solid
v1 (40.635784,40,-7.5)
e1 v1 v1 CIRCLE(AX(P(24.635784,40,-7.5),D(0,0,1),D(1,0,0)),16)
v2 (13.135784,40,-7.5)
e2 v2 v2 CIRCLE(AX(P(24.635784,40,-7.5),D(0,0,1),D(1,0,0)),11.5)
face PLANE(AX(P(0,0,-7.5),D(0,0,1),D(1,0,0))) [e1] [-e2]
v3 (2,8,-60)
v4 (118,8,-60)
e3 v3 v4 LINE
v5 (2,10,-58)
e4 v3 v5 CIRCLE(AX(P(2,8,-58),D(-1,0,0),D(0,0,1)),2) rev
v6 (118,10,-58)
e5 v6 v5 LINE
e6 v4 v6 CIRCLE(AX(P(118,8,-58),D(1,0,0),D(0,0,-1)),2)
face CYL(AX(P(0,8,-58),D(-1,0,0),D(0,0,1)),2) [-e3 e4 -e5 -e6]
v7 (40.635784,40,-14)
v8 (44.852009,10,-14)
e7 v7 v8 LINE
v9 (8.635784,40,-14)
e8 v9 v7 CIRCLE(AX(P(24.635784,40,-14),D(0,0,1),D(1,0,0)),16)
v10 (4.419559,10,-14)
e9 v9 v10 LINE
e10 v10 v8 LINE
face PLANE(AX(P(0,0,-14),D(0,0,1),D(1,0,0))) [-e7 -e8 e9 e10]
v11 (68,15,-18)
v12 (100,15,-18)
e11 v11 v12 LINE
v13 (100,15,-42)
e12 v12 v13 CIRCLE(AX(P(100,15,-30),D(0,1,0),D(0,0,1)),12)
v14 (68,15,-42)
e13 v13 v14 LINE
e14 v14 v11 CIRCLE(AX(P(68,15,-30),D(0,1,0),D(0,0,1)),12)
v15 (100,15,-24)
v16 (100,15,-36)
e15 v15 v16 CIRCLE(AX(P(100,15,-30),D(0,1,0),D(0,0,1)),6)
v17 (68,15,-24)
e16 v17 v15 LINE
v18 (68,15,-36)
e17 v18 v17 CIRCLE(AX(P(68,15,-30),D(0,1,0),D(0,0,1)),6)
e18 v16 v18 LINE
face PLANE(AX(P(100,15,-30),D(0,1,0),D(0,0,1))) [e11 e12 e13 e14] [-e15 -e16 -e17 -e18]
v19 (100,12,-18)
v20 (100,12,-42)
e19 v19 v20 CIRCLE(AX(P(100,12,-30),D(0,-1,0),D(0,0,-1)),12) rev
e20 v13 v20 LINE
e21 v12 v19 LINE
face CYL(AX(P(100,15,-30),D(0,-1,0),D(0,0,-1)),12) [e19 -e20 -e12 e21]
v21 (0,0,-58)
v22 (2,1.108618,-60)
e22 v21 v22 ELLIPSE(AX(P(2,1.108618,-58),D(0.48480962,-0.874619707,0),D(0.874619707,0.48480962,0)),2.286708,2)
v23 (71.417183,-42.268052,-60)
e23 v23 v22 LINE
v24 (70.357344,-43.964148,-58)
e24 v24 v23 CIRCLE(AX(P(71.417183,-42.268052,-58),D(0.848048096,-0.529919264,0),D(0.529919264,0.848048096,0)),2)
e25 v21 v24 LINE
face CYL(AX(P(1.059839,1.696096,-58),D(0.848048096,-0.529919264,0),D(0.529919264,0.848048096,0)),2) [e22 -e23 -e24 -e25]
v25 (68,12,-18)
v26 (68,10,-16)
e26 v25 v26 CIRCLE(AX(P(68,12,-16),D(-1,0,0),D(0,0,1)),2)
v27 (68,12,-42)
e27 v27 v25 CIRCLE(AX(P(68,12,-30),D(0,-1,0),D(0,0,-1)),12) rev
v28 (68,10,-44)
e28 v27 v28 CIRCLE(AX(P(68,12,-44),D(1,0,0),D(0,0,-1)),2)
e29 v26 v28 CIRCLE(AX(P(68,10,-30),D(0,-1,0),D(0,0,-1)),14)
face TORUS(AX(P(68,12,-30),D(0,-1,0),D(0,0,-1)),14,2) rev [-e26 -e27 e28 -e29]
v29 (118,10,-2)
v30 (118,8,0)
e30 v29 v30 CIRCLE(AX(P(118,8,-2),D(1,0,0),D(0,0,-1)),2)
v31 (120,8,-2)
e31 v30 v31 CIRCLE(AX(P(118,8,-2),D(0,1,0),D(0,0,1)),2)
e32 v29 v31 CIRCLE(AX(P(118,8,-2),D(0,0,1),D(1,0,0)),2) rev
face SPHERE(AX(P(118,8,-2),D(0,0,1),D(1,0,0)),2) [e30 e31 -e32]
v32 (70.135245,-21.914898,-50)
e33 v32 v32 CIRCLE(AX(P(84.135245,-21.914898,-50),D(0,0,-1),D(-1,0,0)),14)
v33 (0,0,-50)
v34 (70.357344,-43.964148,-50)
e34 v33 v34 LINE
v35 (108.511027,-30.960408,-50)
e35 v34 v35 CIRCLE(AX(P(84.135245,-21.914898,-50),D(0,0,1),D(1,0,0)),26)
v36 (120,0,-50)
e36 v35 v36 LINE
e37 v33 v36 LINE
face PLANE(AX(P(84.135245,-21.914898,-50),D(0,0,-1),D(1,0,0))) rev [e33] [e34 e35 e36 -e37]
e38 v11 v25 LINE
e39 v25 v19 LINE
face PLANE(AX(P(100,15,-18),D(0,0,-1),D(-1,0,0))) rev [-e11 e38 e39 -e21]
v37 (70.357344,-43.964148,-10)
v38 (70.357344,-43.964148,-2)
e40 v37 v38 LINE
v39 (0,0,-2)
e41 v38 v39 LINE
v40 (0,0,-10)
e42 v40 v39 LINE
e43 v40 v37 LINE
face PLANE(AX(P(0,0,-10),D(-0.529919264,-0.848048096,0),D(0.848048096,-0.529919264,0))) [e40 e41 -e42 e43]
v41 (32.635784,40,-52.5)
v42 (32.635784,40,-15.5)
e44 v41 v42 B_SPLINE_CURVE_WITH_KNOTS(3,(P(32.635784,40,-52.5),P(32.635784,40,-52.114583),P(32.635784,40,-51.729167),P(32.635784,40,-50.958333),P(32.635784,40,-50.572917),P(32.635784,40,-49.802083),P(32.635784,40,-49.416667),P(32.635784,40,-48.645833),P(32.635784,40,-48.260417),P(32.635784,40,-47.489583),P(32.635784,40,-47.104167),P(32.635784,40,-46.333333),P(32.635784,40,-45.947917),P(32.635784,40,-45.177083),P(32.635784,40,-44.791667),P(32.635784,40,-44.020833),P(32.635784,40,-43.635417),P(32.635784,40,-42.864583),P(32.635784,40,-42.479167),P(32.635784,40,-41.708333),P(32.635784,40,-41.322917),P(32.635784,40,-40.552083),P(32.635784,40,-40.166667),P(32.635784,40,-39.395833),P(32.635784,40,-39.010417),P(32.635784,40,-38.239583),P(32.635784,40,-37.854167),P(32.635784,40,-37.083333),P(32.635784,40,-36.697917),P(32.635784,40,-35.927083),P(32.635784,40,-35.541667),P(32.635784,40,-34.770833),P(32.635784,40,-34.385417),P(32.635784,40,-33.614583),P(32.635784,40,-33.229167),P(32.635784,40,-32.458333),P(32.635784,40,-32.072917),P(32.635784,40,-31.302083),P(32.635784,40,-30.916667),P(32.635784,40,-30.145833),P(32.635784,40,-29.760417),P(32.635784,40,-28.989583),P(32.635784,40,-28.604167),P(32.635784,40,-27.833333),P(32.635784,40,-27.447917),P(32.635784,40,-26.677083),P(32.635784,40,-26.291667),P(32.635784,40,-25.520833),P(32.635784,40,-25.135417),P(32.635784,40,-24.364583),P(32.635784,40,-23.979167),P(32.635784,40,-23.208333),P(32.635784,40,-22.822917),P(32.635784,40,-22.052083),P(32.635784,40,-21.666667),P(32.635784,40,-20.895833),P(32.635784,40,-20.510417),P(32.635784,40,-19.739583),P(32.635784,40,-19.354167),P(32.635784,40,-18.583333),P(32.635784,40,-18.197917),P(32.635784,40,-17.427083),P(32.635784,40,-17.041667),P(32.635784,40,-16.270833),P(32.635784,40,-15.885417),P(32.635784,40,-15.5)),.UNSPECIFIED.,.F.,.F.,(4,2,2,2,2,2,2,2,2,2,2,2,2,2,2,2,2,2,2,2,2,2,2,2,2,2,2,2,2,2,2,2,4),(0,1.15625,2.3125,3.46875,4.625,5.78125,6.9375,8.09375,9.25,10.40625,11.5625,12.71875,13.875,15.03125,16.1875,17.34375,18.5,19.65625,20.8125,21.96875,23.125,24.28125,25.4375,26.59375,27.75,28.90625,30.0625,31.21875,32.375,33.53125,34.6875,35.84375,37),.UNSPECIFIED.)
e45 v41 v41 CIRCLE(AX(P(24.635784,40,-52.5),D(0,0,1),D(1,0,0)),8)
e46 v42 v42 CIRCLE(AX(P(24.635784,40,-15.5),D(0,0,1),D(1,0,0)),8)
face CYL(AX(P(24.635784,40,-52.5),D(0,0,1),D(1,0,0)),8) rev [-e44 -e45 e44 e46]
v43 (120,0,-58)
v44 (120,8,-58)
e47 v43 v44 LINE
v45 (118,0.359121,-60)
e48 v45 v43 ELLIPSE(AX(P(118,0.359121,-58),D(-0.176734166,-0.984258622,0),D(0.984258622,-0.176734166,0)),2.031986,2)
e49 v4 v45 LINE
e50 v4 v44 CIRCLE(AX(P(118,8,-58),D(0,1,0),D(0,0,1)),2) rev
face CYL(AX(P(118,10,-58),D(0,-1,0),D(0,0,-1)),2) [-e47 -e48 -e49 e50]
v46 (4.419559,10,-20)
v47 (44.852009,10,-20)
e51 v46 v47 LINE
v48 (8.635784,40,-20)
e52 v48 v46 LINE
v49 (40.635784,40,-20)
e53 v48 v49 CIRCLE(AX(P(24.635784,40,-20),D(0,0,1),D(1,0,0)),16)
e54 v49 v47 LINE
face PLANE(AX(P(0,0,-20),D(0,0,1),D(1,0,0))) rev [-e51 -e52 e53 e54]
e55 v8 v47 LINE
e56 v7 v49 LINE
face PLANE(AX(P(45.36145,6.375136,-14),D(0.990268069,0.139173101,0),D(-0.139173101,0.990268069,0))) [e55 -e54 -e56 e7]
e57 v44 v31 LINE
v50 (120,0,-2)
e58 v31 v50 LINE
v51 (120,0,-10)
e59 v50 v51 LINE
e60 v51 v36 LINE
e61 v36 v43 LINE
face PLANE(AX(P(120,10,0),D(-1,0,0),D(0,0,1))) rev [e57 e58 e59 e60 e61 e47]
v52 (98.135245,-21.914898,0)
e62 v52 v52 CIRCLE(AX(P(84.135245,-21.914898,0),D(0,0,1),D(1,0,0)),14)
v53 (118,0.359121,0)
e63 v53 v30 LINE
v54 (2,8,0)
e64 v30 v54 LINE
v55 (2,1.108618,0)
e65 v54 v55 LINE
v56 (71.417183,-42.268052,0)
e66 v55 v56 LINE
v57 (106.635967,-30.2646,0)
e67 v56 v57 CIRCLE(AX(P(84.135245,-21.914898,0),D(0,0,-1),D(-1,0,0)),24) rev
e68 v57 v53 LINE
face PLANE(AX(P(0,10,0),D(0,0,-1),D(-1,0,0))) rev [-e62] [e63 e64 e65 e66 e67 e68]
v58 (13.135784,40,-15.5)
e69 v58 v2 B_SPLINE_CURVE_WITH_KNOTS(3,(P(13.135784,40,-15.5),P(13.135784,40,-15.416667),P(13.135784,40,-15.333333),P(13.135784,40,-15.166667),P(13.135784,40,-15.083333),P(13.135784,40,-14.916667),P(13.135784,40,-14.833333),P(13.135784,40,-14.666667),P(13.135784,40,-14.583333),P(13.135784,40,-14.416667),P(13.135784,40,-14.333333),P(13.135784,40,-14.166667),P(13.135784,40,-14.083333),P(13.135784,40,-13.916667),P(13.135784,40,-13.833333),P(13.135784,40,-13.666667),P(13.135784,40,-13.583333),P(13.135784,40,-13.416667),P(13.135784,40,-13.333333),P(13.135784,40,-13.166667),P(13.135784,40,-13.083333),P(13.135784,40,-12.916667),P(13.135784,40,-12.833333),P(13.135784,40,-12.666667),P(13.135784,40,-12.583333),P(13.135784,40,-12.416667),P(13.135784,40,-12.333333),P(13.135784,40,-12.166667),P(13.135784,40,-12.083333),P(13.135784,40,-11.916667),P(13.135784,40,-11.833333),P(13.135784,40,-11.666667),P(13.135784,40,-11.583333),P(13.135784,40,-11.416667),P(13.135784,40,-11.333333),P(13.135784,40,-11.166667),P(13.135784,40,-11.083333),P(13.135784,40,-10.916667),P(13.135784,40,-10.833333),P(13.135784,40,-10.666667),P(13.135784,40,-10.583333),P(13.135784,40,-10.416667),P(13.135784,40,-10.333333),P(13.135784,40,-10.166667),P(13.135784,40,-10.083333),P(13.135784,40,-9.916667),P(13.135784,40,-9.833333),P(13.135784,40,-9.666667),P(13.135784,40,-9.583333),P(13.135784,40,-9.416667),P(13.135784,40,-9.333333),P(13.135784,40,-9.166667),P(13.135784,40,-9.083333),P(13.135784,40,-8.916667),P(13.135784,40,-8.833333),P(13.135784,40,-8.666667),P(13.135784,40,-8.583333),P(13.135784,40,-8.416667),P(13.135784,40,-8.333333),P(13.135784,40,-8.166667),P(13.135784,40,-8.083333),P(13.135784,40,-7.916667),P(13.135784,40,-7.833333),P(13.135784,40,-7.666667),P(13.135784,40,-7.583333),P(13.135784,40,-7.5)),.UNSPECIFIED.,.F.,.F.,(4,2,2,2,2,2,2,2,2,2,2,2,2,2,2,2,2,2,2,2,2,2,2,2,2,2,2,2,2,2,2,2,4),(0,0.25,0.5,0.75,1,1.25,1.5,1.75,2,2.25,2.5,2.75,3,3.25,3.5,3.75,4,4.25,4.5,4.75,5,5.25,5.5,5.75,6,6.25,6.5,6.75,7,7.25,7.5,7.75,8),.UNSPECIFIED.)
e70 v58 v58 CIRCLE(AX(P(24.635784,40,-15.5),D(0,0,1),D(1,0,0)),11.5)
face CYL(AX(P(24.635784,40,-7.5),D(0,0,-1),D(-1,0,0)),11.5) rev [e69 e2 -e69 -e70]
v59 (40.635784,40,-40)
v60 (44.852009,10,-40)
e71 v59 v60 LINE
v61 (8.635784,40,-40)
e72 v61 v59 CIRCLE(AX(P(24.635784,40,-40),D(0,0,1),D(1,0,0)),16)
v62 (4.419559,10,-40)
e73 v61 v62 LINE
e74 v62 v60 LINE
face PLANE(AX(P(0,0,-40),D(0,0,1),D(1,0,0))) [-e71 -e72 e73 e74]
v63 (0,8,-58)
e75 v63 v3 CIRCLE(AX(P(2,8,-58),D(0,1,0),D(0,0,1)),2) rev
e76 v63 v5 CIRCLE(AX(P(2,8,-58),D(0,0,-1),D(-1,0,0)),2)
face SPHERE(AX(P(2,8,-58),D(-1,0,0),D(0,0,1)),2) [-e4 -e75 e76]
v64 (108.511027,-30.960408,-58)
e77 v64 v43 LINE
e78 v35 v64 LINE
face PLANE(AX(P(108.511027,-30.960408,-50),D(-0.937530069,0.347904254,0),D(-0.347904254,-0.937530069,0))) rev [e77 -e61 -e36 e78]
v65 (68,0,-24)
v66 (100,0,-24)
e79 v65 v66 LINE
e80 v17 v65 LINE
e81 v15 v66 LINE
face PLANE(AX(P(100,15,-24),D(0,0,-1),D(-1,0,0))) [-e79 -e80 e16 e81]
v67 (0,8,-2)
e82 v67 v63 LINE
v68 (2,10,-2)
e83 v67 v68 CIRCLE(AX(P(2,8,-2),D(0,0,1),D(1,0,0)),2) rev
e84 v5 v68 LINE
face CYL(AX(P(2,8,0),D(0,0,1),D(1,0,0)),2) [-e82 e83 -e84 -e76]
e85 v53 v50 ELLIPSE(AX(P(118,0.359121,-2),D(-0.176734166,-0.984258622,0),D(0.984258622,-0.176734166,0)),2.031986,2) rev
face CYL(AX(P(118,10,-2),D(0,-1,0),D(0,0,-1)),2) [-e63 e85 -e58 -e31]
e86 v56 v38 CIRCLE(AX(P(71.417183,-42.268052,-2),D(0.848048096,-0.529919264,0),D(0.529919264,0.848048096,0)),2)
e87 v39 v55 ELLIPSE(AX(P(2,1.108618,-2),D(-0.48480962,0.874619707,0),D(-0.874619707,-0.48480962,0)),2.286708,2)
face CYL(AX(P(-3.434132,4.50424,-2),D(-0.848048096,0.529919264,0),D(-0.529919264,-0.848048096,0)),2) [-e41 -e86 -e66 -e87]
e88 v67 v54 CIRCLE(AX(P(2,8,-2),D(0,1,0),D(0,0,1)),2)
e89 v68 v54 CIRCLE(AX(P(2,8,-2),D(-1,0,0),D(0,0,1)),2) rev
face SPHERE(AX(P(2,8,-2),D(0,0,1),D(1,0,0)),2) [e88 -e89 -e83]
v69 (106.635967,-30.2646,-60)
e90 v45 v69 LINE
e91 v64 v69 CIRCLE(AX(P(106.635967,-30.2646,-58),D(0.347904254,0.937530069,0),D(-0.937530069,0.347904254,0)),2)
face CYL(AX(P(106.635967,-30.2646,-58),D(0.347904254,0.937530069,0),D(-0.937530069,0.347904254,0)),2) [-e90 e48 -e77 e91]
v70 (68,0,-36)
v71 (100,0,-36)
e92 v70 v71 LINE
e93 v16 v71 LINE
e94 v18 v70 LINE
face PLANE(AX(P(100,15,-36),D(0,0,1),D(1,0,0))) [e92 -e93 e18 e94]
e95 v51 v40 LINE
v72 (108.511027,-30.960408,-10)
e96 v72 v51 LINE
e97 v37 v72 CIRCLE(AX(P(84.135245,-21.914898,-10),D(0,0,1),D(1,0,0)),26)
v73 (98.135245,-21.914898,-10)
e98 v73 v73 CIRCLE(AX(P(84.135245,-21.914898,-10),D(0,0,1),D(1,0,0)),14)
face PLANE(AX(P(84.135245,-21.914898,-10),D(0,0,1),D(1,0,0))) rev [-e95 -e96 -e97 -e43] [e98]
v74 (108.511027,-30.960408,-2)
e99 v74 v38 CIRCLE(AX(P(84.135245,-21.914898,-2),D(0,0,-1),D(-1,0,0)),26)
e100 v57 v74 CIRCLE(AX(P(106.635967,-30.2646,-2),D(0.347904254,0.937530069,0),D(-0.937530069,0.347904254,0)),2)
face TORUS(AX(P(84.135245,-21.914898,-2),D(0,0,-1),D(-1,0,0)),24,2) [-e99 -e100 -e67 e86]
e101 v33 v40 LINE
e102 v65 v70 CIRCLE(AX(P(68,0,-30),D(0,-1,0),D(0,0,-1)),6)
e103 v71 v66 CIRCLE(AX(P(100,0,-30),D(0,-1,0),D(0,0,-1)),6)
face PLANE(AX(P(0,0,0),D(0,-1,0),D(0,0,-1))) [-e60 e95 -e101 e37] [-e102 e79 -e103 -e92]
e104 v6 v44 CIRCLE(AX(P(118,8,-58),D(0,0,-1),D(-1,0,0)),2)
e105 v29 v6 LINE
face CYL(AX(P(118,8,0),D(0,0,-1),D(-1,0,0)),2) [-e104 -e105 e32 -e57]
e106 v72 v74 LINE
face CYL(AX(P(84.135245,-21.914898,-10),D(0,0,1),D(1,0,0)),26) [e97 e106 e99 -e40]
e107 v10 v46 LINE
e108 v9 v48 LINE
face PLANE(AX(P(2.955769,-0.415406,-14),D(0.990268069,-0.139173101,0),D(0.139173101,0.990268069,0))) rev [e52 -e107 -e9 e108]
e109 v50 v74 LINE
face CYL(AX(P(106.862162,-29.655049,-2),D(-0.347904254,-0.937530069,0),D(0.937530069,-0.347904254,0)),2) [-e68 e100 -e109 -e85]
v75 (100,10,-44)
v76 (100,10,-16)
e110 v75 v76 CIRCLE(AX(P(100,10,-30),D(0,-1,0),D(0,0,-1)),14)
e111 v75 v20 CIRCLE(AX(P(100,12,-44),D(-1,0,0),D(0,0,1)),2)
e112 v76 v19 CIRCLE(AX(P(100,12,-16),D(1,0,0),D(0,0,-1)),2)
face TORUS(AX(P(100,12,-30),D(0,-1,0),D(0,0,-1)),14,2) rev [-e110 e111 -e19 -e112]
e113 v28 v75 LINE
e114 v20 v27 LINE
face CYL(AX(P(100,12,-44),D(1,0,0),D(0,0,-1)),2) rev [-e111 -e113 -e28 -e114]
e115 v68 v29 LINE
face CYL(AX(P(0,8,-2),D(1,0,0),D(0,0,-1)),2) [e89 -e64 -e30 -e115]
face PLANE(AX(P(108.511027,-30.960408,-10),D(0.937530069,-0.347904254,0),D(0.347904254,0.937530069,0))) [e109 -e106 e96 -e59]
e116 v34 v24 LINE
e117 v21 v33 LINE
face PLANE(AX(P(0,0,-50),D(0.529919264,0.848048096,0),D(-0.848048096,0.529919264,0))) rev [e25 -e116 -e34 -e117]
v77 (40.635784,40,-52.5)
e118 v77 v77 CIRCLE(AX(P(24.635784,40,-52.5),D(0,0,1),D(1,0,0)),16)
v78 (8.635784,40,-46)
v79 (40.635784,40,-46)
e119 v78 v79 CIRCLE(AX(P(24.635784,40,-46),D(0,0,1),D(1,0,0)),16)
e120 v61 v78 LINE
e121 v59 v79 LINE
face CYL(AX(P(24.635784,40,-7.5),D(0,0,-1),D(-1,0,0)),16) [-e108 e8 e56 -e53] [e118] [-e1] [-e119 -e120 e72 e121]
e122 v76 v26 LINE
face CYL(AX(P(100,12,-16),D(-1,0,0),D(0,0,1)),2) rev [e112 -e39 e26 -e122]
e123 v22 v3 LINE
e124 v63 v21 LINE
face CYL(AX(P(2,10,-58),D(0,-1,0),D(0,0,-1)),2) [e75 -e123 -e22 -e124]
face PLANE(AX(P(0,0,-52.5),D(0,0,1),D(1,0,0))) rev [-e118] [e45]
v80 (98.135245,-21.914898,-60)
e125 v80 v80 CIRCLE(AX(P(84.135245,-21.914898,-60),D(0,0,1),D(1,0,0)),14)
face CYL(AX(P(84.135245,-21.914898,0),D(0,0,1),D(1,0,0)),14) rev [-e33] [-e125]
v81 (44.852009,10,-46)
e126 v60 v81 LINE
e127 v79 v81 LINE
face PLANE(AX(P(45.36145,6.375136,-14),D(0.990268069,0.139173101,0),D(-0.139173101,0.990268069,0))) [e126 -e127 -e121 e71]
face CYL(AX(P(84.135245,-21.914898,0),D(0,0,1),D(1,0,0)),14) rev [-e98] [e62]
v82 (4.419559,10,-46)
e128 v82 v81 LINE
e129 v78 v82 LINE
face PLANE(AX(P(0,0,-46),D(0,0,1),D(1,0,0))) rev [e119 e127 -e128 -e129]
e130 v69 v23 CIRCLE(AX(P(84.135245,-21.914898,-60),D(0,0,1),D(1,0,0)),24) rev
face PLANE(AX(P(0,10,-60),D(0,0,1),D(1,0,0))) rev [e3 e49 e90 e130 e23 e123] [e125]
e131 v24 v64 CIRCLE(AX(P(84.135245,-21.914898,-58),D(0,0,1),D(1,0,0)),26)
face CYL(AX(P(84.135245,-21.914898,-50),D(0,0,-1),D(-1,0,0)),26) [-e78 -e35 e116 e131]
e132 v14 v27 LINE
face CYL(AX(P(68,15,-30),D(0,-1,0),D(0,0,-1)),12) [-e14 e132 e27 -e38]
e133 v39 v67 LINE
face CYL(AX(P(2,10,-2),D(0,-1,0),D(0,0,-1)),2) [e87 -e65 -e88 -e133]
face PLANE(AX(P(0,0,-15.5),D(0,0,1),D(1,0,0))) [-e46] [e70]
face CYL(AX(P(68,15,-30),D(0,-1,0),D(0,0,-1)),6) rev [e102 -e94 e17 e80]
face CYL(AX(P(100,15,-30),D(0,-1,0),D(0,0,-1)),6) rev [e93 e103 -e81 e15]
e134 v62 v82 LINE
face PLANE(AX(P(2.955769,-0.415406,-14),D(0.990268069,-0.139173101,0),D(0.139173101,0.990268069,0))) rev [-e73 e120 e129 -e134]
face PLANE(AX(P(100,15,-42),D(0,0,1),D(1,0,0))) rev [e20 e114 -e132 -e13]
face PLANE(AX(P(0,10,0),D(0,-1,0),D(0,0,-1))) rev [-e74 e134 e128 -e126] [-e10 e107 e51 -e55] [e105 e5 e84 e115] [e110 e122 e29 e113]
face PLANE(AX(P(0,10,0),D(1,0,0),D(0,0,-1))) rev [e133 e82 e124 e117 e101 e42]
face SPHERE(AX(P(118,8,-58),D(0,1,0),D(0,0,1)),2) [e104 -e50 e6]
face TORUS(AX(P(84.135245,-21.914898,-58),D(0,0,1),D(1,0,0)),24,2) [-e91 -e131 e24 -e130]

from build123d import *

# Parameters (mm, degrees)
SKETCH1_W                  = 120
SKETCH1_H                  = 60
BOSS_EXTRUDE1_DEPTH        = 10
BOSS_EXTRUDE2_DEPTH        = 10
F_25_0_28_DIAMETER_HOLE1_D = 28
BOSS_EXTRUDE3_DEPTH        = 5
CUT_EXTRUDE1_DEPTH         = 147.130542204
SKETCH7_R                  = 11.5
BOSS_EXTRUDE4_DEPTH        = 22.5
BOSS_EXTRUDE5_DEPTH        = 16
CUT_EXTRUDE2_DEPTH         = 10
BOSS_EXTRUDE6_DEPTH        = 14.5
BOSS_EXTRUDE6_DEPTH_BACK   = 22.5
SKETCH7_7_R                = 11.5
SKETCH7_7_R_2              = 8
FILLET1_R                  = 2


with BuildPart() as part:
    # Sketch1 → Boss-Extrude1 (new body)
    with BuildSketch(Plane(origin=(0, 0, 0), x_dir=(1, 0, 0), z_dir=(0, 1, 0))):
        with Locations((60, 30)):
            Rectangle(SKETCH1_W, SKETCH1_H)
    extrude(amount=BOSS_EXTRUDE1_DEPTH)

    # Sketch2 → Boss-Extrude2 (add)
    with BuildSketch(Plane.XY):
        with BuildLine():
            Line((0, 10), (0, 0))
            Line((0, 0), (70.357344256, -43.964148108))
            ThreePointArc((70.357344256, -43.964148108), (92.522919584, -46.524792309), (108.511026917, -30.960408214))
            Line((108.511026917, -30.960408214), (120, 0))
            Line((120, 0), (120, 10))
            Line((120, 10), (0, 10))
        make_face()
    boss_extrude2 = extrude(amount=-BOSS_EXTRUDE2_DEPTH)

    # Mirror1: Boss-Extrude2 across plane
    add(boss_extrude2.mirror(Plane.XY.offset(-30)))

    # Ø25.0 (28) Diameter Hole1 (through all)
    with Locations(Plane(origin=(84.135245127, -21.914897608, 0), x_dir=(1, 0, 0), z_dir=(0, 0, 1))):
        with Locations((0, 0)):
            Hole(F_25_0_28_DIAMETER_HOLE1_D / 2)

    # Sketch5 → Boss-Extrude3 (add)
    with BuildSketch(Plane(origin=(0, 10, 0), x_dir=(1, 0, 0), z_dir=(0, 1, 0))):
        with BuildLine():
            Line((100, 18), (68, 18))
            ThreePointArc((68, 18), (56, 30), (68, 42))
            Line((68, 42), (100, 42))
            ThreePointArc((100, 42), (112, 30), (100, 18))
        make_face()
        with BuildLine():
            Line((100, 24), (68, 24))
            ThreePointArc((68, 24), (62, 30), (68, 36))
            Line((68, 36), (100, 36))
            ThreePointArc((100, 36), (106, 30), (100, 24))
        make_face(mode=Mode.SUBTRACT)
    extrude(amount=BOSS_EXTRUDE3_DEPTH)

    # Sketch5<2> → Cut-Extrude1 (cut, through all)
    with BuildSketch(Plane(origin=(0, 10, 0), x_dir=(1, 0, 0), z_dir=(0, 1, 0))):
        with BuildLine():
            Line((68, 24), (100, 24))
            ThreePointArc((100, 24), (106, 30), (100, 36))
            Line((100, 36), (68, 36))
            ThreePointArc((68, 36), (62, 30), (68, 24))
        make_face()
    extrude(amount=-CUT_EXTRUDE1_DEPTH, mode=Mode.SUBTRACT)



with BuildPart() as body_2:
    # Sketch7 → Boss-Extrude4 (new, symmetric)
    with BuildSketch(Plane.XY.offset(-30)):
        with BuildLine():
            ThreePointArc((40.635783634, 40), (24.635783634, 56), (8.635783634, 40))
            ThreePointArc((8.635783634, 40), (24.635783634, 24), (40.635783634, 40))
        make_face()
        with Locations((24.635783634, 40)):
            Circle(SKETCH7_R, mode=Mode.SUBTRACT)
    extrude(amount=BOSS_EXTRUDE4_DEPTH, both=True)


with BuildPart() as part_1:
    add(part.part)

    add(body_2.part)  # Boss-Extrude5 merges body 2
    # Sketch7<3> → Boss-Extrude5 (add, symmetric)
    with BuildSketch(Plane.XY.offset(-30)):
        with BuildLine():
            Line((8.635783634, 40), (4.419558593, 10))
            Line((4.419558593, 10), (44.852008675, 10))
            Line((44.852008675, 10), (40.635783634, 40))
            ThreePointArc((40.635783634, 40), (24.635783634, 24), (8.635783634, 40))
        make_face()
    extrude(amount=BOSS_EXTRUDE5_DEPTH, both=True)

    # Sketch7<5> → Cut-Extrude2 (cut, symmetric)
    with BuildSketch(Plane.XY.offset(-30)):
        with BuildLine():
            Line((8.635783634, 40), (4.419558593, 10))
            Line((4.419558593, 10), (44.852008675, 10))
            Line((44.852008675, 10), (40.635783634, 40))
            ThreePointArc((40.635783634, 40), (24.635783634, 24), (8.635783634, 40))
        make_face()
    extrude(amount=CUT_EXTRUDE2_DEPTH, both=True, mode=Mode.SUBTRACT)

    # Sketch7<7> → Boss-Extrude6 (add, two sides: drawn at the far end of the back side and taken through both)
    with BuildSketch(Plane.XY.offset(-30).offset(-BOSS_EXTRUDE6_DEPTH_BACK)):
        with Locations((24.635783634, 40)):
            Circle(SKETCH7_7_R)
        with Locations((24.635783634, 40)):
            Circle(SKETCH7_7_R_2, mode=Mode.SUBTRACT)
    extrude(amount=BOSS_EXTRUDE6_DEPTH + BOSS_EXTRUDE6_DEPTH_BACK)

    # Fillet1
    fillet1_edges = [part_1.edges().sort_by_distance(p)[0] for p in [
        (114.255513458, -15.480204107, -60),
        (92.522919584, -46.524792309, -60),
        (114.255513458, -15.480204107, 0),
        (92.522919584, -46.524792309, 0),
        (84, 10, -18),
        (56, 10, -30),
        (84, 10, -42),
        (120, 5, -60),
        (120, 5, 0),
        (0, 5, -60),
        (35.178672128, -21.982074054, -60),
        (0, 5, 0),
        (35.178672128, -21.982074054, 0),
        (60, 10, -60),
        (0, 10, -30),
        (120, 10, -30),
        (60, 10, 0),
        (112, 10, -30),
    ]]
    fillet(fillet1_edges, radius=FILLET1_R)


solid = part_1.part
